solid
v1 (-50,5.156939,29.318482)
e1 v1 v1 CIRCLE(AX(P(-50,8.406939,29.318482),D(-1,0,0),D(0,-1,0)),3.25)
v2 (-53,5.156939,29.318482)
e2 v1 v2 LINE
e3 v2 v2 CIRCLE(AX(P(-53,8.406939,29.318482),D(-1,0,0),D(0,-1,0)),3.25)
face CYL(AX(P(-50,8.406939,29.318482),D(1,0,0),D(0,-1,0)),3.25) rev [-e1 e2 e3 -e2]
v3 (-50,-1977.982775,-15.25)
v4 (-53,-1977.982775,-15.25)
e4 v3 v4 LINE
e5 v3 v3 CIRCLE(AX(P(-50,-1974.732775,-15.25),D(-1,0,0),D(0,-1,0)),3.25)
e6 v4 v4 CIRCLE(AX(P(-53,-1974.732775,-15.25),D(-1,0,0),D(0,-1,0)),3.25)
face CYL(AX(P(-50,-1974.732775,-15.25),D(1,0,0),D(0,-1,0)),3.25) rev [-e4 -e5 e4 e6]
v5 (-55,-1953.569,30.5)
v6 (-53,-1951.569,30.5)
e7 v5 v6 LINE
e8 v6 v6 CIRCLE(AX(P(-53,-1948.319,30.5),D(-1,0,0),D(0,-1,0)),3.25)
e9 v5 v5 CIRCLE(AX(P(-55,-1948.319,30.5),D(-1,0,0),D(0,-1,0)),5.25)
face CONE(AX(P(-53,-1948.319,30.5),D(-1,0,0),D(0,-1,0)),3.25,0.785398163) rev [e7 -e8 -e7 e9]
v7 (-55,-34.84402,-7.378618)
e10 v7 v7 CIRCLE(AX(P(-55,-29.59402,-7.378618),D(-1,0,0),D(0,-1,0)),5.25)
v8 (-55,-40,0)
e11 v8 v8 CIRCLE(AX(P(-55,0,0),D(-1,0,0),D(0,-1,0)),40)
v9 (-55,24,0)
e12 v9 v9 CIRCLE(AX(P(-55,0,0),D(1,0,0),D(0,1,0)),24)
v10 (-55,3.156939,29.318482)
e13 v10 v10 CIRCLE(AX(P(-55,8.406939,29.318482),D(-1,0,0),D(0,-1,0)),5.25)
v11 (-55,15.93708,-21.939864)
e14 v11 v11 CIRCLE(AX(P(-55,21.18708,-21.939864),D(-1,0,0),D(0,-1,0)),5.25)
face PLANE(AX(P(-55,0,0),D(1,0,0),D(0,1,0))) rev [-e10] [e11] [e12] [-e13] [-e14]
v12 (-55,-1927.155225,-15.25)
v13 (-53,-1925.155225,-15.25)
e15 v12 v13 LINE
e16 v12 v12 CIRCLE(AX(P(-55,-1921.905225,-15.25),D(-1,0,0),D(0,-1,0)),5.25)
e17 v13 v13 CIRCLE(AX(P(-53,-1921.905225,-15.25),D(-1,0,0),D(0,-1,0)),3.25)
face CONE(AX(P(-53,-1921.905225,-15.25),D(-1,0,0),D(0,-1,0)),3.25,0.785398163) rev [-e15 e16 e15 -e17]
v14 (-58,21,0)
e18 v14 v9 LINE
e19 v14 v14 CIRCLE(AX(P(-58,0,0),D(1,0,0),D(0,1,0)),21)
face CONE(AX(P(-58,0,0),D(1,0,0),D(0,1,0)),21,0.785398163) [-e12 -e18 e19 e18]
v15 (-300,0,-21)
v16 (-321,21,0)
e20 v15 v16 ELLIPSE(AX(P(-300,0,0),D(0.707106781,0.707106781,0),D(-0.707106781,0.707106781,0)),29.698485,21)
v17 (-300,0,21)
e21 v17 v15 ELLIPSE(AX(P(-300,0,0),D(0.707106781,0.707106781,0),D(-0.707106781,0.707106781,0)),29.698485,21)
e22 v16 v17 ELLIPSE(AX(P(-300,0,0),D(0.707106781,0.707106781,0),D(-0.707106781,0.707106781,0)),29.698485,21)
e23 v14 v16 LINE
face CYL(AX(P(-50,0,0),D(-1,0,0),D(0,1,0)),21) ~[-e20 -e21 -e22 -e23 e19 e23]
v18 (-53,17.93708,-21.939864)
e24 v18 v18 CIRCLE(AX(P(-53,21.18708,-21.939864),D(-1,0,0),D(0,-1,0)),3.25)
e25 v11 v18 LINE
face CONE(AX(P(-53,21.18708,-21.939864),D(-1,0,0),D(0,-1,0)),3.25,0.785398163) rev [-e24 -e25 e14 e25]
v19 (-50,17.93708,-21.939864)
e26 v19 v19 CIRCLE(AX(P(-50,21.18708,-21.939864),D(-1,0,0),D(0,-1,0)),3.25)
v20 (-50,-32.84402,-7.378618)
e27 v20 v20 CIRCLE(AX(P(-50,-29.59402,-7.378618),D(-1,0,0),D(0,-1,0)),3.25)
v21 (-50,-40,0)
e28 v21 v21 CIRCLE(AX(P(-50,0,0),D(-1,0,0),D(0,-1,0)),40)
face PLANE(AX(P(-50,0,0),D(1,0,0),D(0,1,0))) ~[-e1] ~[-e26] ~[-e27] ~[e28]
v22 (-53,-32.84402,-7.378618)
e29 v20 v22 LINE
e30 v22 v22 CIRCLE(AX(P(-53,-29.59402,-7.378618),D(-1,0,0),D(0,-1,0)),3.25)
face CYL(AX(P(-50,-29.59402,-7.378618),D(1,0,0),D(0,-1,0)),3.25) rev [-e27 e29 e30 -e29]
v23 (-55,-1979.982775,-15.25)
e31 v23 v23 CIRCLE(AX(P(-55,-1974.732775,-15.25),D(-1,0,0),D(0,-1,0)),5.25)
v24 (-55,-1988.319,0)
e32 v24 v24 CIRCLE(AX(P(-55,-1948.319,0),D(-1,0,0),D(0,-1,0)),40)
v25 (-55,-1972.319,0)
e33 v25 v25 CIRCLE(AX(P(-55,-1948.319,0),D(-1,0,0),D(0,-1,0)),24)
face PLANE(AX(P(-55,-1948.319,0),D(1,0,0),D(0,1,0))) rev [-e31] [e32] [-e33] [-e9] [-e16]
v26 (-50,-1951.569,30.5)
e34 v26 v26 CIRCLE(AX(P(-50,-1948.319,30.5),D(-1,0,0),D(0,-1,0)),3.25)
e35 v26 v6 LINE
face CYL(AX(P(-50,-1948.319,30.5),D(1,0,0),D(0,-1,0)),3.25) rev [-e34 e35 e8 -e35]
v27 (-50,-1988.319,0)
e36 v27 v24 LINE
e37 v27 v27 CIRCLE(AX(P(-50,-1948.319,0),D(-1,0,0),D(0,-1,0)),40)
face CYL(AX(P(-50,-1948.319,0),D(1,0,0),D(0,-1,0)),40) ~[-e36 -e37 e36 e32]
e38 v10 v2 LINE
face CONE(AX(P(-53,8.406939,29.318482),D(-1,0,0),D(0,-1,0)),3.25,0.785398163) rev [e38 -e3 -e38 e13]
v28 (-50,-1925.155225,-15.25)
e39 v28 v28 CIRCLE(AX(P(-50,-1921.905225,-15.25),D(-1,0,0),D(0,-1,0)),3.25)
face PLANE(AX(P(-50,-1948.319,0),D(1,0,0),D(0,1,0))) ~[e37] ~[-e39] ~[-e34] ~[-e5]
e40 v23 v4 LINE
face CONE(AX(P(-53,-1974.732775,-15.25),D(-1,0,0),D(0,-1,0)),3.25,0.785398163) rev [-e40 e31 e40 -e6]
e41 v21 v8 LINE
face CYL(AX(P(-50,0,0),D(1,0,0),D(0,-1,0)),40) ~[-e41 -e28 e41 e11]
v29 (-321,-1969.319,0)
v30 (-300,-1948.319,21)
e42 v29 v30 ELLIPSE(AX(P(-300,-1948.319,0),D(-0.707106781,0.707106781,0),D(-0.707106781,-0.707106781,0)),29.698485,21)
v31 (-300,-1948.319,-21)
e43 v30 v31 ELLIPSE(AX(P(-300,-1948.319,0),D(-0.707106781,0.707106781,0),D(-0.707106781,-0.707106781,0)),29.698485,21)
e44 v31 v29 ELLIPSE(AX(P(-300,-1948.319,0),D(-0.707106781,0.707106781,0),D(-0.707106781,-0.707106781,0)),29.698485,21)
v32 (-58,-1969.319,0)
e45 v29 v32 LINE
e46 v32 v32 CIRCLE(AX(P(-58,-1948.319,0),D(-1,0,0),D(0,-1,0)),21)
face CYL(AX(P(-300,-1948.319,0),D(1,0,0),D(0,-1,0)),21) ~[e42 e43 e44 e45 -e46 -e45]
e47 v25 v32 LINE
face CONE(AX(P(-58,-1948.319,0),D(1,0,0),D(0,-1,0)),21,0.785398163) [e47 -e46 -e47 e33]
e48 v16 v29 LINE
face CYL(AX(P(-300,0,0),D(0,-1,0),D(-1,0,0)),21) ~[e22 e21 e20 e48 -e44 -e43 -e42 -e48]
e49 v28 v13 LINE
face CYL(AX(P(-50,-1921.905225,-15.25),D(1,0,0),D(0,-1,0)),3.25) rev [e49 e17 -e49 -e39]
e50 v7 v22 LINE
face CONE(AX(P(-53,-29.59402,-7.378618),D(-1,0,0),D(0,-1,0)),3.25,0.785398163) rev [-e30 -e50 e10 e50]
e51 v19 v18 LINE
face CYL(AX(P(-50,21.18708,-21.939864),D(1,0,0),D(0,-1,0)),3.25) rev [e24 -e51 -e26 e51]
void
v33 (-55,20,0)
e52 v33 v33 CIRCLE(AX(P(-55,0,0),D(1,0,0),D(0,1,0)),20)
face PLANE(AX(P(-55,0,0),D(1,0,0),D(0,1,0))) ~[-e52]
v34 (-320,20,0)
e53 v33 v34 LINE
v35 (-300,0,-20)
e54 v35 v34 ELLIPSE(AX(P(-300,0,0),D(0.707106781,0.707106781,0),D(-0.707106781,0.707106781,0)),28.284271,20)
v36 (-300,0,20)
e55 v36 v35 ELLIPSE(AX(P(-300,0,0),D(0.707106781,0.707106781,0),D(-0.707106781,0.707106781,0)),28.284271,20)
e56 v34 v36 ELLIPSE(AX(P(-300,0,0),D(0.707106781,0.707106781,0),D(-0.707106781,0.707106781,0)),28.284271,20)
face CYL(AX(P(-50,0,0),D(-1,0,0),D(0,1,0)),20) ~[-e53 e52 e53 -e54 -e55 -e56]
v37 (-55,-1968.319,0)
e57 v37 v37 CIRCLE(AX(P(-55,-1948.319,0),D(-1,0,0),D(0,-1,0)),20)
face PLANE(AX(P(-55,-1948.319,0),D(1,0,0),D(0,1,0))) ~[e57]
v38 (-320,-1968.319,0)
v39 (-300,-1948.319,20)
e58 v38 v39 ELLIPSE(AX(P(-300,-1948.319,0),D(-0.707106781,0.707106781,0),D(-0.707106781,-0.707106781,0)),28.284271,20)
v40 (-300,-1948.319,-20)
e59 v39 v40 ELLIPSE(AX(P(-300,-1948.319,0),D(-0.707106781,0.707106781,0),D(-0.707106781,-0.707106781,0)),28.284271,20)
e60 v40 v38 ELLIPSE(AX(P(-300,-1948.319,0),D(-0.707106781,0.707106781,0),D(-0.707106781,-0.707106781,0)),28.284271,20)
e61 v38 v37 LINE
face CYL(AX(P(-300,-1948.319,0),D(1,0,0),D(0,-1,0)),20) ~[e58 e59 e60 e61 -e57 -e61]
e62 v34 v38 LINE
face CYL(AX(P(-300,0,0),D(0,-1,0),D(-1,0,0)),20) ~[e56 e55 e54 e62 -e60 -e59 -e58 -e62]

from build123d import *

# Parameters (mm, degrees)
F0_R     = 21
F0_R_2   = 20
F3_R     = 40
F3_R_2   = 3.25
F4_DEPTH = 5
F8_SIZE  = 2
F9_SIZE  = 3


with BuildPart() as f2:
    # F2: sweep along a path in F1
    with BuildLine(Plane.XY) as f2_path:
        Line((0, 0), (250, 0))
        Line((250, 0), (250, -1948.319))
        Line((250, -1948.319), (0, -1948.319))
    # F0 (on Right) → F2 (sweep)
    with BuildSketch(Plane.YZ):
        Circle(F0_R)
        Circle(F0_R_2, mode=Mode.SUBTRACT)
    sweep(path=f2_path.line, transition=Transition.RIGHT)

    # F3 (on face) → F4 (join)
    with BuildSketch(Plane(origin=(0, 0, 0), x_dir=(0, -1, 0), z_dir=(-1, 0, 0))):
        with Locations((1948.319, 0)):
            Circle(F3_R)
        with Locations((1921.9052251846, -15.25)):
            Circle(F3_R_2, mode=Mode.SUBTRACT)
        with Locations((1974.7327748154, -15.25)):
            Circle(F3_R_2, mode=Mode.SUBTRACT)
        with Locations((1948.319, 30.5)):
            Circle(F3_R_2, mode=Mode.SUBTRACT)
        Circle(F3_R)
        with Locations((-21.187080299, -21.9398639103)):
            Circle(F3_R_2, mode=Mode.SUBTRACT)
        with Locations((29.5940196514, -7.3786178158)):
            Circle(F3_R_2, mode=Mode.SUBTRACT)
        with Locations((-8.4069393524, 29.3184817261)):
            Circle(F3_R_2, mode=Mode.SUBTRACT)
    extrude(amount=-F4_DEPTH)


with BuildPart() as f6_1:
    # F6: instance of F2
    add(f2.part.mirror(Plane(origin=(-25, 0, 0), x_dir=(0, -1, 0), z_dir=(-1, 0, 0))))

    # F8
    f8_edges = [f6_1.edges().sort_by_distance(p)[0] for p in [
        (-55, -1945.069, 30.5),
        (-55, -1918.655225, -15.25),
        (-55, -1971.482775, -15.25),
        (-55, 11.656939, 29.318482),
        (-55, -26.34402, -7.378618),
        (-55, 24.43708, -21.939864),
    ]]
    chamfer(f8_edges, length=F8_SIZE)

    # F9
    f9_edges = [f6_1.edges().sort_by_distance(p)[0] for p in [
        (-55, -21, 0),
        (-55, -1927.319, 0),
    ]]
    chamfer(f9_edges, length=F9_SIZE)


solid = f6_1.part
